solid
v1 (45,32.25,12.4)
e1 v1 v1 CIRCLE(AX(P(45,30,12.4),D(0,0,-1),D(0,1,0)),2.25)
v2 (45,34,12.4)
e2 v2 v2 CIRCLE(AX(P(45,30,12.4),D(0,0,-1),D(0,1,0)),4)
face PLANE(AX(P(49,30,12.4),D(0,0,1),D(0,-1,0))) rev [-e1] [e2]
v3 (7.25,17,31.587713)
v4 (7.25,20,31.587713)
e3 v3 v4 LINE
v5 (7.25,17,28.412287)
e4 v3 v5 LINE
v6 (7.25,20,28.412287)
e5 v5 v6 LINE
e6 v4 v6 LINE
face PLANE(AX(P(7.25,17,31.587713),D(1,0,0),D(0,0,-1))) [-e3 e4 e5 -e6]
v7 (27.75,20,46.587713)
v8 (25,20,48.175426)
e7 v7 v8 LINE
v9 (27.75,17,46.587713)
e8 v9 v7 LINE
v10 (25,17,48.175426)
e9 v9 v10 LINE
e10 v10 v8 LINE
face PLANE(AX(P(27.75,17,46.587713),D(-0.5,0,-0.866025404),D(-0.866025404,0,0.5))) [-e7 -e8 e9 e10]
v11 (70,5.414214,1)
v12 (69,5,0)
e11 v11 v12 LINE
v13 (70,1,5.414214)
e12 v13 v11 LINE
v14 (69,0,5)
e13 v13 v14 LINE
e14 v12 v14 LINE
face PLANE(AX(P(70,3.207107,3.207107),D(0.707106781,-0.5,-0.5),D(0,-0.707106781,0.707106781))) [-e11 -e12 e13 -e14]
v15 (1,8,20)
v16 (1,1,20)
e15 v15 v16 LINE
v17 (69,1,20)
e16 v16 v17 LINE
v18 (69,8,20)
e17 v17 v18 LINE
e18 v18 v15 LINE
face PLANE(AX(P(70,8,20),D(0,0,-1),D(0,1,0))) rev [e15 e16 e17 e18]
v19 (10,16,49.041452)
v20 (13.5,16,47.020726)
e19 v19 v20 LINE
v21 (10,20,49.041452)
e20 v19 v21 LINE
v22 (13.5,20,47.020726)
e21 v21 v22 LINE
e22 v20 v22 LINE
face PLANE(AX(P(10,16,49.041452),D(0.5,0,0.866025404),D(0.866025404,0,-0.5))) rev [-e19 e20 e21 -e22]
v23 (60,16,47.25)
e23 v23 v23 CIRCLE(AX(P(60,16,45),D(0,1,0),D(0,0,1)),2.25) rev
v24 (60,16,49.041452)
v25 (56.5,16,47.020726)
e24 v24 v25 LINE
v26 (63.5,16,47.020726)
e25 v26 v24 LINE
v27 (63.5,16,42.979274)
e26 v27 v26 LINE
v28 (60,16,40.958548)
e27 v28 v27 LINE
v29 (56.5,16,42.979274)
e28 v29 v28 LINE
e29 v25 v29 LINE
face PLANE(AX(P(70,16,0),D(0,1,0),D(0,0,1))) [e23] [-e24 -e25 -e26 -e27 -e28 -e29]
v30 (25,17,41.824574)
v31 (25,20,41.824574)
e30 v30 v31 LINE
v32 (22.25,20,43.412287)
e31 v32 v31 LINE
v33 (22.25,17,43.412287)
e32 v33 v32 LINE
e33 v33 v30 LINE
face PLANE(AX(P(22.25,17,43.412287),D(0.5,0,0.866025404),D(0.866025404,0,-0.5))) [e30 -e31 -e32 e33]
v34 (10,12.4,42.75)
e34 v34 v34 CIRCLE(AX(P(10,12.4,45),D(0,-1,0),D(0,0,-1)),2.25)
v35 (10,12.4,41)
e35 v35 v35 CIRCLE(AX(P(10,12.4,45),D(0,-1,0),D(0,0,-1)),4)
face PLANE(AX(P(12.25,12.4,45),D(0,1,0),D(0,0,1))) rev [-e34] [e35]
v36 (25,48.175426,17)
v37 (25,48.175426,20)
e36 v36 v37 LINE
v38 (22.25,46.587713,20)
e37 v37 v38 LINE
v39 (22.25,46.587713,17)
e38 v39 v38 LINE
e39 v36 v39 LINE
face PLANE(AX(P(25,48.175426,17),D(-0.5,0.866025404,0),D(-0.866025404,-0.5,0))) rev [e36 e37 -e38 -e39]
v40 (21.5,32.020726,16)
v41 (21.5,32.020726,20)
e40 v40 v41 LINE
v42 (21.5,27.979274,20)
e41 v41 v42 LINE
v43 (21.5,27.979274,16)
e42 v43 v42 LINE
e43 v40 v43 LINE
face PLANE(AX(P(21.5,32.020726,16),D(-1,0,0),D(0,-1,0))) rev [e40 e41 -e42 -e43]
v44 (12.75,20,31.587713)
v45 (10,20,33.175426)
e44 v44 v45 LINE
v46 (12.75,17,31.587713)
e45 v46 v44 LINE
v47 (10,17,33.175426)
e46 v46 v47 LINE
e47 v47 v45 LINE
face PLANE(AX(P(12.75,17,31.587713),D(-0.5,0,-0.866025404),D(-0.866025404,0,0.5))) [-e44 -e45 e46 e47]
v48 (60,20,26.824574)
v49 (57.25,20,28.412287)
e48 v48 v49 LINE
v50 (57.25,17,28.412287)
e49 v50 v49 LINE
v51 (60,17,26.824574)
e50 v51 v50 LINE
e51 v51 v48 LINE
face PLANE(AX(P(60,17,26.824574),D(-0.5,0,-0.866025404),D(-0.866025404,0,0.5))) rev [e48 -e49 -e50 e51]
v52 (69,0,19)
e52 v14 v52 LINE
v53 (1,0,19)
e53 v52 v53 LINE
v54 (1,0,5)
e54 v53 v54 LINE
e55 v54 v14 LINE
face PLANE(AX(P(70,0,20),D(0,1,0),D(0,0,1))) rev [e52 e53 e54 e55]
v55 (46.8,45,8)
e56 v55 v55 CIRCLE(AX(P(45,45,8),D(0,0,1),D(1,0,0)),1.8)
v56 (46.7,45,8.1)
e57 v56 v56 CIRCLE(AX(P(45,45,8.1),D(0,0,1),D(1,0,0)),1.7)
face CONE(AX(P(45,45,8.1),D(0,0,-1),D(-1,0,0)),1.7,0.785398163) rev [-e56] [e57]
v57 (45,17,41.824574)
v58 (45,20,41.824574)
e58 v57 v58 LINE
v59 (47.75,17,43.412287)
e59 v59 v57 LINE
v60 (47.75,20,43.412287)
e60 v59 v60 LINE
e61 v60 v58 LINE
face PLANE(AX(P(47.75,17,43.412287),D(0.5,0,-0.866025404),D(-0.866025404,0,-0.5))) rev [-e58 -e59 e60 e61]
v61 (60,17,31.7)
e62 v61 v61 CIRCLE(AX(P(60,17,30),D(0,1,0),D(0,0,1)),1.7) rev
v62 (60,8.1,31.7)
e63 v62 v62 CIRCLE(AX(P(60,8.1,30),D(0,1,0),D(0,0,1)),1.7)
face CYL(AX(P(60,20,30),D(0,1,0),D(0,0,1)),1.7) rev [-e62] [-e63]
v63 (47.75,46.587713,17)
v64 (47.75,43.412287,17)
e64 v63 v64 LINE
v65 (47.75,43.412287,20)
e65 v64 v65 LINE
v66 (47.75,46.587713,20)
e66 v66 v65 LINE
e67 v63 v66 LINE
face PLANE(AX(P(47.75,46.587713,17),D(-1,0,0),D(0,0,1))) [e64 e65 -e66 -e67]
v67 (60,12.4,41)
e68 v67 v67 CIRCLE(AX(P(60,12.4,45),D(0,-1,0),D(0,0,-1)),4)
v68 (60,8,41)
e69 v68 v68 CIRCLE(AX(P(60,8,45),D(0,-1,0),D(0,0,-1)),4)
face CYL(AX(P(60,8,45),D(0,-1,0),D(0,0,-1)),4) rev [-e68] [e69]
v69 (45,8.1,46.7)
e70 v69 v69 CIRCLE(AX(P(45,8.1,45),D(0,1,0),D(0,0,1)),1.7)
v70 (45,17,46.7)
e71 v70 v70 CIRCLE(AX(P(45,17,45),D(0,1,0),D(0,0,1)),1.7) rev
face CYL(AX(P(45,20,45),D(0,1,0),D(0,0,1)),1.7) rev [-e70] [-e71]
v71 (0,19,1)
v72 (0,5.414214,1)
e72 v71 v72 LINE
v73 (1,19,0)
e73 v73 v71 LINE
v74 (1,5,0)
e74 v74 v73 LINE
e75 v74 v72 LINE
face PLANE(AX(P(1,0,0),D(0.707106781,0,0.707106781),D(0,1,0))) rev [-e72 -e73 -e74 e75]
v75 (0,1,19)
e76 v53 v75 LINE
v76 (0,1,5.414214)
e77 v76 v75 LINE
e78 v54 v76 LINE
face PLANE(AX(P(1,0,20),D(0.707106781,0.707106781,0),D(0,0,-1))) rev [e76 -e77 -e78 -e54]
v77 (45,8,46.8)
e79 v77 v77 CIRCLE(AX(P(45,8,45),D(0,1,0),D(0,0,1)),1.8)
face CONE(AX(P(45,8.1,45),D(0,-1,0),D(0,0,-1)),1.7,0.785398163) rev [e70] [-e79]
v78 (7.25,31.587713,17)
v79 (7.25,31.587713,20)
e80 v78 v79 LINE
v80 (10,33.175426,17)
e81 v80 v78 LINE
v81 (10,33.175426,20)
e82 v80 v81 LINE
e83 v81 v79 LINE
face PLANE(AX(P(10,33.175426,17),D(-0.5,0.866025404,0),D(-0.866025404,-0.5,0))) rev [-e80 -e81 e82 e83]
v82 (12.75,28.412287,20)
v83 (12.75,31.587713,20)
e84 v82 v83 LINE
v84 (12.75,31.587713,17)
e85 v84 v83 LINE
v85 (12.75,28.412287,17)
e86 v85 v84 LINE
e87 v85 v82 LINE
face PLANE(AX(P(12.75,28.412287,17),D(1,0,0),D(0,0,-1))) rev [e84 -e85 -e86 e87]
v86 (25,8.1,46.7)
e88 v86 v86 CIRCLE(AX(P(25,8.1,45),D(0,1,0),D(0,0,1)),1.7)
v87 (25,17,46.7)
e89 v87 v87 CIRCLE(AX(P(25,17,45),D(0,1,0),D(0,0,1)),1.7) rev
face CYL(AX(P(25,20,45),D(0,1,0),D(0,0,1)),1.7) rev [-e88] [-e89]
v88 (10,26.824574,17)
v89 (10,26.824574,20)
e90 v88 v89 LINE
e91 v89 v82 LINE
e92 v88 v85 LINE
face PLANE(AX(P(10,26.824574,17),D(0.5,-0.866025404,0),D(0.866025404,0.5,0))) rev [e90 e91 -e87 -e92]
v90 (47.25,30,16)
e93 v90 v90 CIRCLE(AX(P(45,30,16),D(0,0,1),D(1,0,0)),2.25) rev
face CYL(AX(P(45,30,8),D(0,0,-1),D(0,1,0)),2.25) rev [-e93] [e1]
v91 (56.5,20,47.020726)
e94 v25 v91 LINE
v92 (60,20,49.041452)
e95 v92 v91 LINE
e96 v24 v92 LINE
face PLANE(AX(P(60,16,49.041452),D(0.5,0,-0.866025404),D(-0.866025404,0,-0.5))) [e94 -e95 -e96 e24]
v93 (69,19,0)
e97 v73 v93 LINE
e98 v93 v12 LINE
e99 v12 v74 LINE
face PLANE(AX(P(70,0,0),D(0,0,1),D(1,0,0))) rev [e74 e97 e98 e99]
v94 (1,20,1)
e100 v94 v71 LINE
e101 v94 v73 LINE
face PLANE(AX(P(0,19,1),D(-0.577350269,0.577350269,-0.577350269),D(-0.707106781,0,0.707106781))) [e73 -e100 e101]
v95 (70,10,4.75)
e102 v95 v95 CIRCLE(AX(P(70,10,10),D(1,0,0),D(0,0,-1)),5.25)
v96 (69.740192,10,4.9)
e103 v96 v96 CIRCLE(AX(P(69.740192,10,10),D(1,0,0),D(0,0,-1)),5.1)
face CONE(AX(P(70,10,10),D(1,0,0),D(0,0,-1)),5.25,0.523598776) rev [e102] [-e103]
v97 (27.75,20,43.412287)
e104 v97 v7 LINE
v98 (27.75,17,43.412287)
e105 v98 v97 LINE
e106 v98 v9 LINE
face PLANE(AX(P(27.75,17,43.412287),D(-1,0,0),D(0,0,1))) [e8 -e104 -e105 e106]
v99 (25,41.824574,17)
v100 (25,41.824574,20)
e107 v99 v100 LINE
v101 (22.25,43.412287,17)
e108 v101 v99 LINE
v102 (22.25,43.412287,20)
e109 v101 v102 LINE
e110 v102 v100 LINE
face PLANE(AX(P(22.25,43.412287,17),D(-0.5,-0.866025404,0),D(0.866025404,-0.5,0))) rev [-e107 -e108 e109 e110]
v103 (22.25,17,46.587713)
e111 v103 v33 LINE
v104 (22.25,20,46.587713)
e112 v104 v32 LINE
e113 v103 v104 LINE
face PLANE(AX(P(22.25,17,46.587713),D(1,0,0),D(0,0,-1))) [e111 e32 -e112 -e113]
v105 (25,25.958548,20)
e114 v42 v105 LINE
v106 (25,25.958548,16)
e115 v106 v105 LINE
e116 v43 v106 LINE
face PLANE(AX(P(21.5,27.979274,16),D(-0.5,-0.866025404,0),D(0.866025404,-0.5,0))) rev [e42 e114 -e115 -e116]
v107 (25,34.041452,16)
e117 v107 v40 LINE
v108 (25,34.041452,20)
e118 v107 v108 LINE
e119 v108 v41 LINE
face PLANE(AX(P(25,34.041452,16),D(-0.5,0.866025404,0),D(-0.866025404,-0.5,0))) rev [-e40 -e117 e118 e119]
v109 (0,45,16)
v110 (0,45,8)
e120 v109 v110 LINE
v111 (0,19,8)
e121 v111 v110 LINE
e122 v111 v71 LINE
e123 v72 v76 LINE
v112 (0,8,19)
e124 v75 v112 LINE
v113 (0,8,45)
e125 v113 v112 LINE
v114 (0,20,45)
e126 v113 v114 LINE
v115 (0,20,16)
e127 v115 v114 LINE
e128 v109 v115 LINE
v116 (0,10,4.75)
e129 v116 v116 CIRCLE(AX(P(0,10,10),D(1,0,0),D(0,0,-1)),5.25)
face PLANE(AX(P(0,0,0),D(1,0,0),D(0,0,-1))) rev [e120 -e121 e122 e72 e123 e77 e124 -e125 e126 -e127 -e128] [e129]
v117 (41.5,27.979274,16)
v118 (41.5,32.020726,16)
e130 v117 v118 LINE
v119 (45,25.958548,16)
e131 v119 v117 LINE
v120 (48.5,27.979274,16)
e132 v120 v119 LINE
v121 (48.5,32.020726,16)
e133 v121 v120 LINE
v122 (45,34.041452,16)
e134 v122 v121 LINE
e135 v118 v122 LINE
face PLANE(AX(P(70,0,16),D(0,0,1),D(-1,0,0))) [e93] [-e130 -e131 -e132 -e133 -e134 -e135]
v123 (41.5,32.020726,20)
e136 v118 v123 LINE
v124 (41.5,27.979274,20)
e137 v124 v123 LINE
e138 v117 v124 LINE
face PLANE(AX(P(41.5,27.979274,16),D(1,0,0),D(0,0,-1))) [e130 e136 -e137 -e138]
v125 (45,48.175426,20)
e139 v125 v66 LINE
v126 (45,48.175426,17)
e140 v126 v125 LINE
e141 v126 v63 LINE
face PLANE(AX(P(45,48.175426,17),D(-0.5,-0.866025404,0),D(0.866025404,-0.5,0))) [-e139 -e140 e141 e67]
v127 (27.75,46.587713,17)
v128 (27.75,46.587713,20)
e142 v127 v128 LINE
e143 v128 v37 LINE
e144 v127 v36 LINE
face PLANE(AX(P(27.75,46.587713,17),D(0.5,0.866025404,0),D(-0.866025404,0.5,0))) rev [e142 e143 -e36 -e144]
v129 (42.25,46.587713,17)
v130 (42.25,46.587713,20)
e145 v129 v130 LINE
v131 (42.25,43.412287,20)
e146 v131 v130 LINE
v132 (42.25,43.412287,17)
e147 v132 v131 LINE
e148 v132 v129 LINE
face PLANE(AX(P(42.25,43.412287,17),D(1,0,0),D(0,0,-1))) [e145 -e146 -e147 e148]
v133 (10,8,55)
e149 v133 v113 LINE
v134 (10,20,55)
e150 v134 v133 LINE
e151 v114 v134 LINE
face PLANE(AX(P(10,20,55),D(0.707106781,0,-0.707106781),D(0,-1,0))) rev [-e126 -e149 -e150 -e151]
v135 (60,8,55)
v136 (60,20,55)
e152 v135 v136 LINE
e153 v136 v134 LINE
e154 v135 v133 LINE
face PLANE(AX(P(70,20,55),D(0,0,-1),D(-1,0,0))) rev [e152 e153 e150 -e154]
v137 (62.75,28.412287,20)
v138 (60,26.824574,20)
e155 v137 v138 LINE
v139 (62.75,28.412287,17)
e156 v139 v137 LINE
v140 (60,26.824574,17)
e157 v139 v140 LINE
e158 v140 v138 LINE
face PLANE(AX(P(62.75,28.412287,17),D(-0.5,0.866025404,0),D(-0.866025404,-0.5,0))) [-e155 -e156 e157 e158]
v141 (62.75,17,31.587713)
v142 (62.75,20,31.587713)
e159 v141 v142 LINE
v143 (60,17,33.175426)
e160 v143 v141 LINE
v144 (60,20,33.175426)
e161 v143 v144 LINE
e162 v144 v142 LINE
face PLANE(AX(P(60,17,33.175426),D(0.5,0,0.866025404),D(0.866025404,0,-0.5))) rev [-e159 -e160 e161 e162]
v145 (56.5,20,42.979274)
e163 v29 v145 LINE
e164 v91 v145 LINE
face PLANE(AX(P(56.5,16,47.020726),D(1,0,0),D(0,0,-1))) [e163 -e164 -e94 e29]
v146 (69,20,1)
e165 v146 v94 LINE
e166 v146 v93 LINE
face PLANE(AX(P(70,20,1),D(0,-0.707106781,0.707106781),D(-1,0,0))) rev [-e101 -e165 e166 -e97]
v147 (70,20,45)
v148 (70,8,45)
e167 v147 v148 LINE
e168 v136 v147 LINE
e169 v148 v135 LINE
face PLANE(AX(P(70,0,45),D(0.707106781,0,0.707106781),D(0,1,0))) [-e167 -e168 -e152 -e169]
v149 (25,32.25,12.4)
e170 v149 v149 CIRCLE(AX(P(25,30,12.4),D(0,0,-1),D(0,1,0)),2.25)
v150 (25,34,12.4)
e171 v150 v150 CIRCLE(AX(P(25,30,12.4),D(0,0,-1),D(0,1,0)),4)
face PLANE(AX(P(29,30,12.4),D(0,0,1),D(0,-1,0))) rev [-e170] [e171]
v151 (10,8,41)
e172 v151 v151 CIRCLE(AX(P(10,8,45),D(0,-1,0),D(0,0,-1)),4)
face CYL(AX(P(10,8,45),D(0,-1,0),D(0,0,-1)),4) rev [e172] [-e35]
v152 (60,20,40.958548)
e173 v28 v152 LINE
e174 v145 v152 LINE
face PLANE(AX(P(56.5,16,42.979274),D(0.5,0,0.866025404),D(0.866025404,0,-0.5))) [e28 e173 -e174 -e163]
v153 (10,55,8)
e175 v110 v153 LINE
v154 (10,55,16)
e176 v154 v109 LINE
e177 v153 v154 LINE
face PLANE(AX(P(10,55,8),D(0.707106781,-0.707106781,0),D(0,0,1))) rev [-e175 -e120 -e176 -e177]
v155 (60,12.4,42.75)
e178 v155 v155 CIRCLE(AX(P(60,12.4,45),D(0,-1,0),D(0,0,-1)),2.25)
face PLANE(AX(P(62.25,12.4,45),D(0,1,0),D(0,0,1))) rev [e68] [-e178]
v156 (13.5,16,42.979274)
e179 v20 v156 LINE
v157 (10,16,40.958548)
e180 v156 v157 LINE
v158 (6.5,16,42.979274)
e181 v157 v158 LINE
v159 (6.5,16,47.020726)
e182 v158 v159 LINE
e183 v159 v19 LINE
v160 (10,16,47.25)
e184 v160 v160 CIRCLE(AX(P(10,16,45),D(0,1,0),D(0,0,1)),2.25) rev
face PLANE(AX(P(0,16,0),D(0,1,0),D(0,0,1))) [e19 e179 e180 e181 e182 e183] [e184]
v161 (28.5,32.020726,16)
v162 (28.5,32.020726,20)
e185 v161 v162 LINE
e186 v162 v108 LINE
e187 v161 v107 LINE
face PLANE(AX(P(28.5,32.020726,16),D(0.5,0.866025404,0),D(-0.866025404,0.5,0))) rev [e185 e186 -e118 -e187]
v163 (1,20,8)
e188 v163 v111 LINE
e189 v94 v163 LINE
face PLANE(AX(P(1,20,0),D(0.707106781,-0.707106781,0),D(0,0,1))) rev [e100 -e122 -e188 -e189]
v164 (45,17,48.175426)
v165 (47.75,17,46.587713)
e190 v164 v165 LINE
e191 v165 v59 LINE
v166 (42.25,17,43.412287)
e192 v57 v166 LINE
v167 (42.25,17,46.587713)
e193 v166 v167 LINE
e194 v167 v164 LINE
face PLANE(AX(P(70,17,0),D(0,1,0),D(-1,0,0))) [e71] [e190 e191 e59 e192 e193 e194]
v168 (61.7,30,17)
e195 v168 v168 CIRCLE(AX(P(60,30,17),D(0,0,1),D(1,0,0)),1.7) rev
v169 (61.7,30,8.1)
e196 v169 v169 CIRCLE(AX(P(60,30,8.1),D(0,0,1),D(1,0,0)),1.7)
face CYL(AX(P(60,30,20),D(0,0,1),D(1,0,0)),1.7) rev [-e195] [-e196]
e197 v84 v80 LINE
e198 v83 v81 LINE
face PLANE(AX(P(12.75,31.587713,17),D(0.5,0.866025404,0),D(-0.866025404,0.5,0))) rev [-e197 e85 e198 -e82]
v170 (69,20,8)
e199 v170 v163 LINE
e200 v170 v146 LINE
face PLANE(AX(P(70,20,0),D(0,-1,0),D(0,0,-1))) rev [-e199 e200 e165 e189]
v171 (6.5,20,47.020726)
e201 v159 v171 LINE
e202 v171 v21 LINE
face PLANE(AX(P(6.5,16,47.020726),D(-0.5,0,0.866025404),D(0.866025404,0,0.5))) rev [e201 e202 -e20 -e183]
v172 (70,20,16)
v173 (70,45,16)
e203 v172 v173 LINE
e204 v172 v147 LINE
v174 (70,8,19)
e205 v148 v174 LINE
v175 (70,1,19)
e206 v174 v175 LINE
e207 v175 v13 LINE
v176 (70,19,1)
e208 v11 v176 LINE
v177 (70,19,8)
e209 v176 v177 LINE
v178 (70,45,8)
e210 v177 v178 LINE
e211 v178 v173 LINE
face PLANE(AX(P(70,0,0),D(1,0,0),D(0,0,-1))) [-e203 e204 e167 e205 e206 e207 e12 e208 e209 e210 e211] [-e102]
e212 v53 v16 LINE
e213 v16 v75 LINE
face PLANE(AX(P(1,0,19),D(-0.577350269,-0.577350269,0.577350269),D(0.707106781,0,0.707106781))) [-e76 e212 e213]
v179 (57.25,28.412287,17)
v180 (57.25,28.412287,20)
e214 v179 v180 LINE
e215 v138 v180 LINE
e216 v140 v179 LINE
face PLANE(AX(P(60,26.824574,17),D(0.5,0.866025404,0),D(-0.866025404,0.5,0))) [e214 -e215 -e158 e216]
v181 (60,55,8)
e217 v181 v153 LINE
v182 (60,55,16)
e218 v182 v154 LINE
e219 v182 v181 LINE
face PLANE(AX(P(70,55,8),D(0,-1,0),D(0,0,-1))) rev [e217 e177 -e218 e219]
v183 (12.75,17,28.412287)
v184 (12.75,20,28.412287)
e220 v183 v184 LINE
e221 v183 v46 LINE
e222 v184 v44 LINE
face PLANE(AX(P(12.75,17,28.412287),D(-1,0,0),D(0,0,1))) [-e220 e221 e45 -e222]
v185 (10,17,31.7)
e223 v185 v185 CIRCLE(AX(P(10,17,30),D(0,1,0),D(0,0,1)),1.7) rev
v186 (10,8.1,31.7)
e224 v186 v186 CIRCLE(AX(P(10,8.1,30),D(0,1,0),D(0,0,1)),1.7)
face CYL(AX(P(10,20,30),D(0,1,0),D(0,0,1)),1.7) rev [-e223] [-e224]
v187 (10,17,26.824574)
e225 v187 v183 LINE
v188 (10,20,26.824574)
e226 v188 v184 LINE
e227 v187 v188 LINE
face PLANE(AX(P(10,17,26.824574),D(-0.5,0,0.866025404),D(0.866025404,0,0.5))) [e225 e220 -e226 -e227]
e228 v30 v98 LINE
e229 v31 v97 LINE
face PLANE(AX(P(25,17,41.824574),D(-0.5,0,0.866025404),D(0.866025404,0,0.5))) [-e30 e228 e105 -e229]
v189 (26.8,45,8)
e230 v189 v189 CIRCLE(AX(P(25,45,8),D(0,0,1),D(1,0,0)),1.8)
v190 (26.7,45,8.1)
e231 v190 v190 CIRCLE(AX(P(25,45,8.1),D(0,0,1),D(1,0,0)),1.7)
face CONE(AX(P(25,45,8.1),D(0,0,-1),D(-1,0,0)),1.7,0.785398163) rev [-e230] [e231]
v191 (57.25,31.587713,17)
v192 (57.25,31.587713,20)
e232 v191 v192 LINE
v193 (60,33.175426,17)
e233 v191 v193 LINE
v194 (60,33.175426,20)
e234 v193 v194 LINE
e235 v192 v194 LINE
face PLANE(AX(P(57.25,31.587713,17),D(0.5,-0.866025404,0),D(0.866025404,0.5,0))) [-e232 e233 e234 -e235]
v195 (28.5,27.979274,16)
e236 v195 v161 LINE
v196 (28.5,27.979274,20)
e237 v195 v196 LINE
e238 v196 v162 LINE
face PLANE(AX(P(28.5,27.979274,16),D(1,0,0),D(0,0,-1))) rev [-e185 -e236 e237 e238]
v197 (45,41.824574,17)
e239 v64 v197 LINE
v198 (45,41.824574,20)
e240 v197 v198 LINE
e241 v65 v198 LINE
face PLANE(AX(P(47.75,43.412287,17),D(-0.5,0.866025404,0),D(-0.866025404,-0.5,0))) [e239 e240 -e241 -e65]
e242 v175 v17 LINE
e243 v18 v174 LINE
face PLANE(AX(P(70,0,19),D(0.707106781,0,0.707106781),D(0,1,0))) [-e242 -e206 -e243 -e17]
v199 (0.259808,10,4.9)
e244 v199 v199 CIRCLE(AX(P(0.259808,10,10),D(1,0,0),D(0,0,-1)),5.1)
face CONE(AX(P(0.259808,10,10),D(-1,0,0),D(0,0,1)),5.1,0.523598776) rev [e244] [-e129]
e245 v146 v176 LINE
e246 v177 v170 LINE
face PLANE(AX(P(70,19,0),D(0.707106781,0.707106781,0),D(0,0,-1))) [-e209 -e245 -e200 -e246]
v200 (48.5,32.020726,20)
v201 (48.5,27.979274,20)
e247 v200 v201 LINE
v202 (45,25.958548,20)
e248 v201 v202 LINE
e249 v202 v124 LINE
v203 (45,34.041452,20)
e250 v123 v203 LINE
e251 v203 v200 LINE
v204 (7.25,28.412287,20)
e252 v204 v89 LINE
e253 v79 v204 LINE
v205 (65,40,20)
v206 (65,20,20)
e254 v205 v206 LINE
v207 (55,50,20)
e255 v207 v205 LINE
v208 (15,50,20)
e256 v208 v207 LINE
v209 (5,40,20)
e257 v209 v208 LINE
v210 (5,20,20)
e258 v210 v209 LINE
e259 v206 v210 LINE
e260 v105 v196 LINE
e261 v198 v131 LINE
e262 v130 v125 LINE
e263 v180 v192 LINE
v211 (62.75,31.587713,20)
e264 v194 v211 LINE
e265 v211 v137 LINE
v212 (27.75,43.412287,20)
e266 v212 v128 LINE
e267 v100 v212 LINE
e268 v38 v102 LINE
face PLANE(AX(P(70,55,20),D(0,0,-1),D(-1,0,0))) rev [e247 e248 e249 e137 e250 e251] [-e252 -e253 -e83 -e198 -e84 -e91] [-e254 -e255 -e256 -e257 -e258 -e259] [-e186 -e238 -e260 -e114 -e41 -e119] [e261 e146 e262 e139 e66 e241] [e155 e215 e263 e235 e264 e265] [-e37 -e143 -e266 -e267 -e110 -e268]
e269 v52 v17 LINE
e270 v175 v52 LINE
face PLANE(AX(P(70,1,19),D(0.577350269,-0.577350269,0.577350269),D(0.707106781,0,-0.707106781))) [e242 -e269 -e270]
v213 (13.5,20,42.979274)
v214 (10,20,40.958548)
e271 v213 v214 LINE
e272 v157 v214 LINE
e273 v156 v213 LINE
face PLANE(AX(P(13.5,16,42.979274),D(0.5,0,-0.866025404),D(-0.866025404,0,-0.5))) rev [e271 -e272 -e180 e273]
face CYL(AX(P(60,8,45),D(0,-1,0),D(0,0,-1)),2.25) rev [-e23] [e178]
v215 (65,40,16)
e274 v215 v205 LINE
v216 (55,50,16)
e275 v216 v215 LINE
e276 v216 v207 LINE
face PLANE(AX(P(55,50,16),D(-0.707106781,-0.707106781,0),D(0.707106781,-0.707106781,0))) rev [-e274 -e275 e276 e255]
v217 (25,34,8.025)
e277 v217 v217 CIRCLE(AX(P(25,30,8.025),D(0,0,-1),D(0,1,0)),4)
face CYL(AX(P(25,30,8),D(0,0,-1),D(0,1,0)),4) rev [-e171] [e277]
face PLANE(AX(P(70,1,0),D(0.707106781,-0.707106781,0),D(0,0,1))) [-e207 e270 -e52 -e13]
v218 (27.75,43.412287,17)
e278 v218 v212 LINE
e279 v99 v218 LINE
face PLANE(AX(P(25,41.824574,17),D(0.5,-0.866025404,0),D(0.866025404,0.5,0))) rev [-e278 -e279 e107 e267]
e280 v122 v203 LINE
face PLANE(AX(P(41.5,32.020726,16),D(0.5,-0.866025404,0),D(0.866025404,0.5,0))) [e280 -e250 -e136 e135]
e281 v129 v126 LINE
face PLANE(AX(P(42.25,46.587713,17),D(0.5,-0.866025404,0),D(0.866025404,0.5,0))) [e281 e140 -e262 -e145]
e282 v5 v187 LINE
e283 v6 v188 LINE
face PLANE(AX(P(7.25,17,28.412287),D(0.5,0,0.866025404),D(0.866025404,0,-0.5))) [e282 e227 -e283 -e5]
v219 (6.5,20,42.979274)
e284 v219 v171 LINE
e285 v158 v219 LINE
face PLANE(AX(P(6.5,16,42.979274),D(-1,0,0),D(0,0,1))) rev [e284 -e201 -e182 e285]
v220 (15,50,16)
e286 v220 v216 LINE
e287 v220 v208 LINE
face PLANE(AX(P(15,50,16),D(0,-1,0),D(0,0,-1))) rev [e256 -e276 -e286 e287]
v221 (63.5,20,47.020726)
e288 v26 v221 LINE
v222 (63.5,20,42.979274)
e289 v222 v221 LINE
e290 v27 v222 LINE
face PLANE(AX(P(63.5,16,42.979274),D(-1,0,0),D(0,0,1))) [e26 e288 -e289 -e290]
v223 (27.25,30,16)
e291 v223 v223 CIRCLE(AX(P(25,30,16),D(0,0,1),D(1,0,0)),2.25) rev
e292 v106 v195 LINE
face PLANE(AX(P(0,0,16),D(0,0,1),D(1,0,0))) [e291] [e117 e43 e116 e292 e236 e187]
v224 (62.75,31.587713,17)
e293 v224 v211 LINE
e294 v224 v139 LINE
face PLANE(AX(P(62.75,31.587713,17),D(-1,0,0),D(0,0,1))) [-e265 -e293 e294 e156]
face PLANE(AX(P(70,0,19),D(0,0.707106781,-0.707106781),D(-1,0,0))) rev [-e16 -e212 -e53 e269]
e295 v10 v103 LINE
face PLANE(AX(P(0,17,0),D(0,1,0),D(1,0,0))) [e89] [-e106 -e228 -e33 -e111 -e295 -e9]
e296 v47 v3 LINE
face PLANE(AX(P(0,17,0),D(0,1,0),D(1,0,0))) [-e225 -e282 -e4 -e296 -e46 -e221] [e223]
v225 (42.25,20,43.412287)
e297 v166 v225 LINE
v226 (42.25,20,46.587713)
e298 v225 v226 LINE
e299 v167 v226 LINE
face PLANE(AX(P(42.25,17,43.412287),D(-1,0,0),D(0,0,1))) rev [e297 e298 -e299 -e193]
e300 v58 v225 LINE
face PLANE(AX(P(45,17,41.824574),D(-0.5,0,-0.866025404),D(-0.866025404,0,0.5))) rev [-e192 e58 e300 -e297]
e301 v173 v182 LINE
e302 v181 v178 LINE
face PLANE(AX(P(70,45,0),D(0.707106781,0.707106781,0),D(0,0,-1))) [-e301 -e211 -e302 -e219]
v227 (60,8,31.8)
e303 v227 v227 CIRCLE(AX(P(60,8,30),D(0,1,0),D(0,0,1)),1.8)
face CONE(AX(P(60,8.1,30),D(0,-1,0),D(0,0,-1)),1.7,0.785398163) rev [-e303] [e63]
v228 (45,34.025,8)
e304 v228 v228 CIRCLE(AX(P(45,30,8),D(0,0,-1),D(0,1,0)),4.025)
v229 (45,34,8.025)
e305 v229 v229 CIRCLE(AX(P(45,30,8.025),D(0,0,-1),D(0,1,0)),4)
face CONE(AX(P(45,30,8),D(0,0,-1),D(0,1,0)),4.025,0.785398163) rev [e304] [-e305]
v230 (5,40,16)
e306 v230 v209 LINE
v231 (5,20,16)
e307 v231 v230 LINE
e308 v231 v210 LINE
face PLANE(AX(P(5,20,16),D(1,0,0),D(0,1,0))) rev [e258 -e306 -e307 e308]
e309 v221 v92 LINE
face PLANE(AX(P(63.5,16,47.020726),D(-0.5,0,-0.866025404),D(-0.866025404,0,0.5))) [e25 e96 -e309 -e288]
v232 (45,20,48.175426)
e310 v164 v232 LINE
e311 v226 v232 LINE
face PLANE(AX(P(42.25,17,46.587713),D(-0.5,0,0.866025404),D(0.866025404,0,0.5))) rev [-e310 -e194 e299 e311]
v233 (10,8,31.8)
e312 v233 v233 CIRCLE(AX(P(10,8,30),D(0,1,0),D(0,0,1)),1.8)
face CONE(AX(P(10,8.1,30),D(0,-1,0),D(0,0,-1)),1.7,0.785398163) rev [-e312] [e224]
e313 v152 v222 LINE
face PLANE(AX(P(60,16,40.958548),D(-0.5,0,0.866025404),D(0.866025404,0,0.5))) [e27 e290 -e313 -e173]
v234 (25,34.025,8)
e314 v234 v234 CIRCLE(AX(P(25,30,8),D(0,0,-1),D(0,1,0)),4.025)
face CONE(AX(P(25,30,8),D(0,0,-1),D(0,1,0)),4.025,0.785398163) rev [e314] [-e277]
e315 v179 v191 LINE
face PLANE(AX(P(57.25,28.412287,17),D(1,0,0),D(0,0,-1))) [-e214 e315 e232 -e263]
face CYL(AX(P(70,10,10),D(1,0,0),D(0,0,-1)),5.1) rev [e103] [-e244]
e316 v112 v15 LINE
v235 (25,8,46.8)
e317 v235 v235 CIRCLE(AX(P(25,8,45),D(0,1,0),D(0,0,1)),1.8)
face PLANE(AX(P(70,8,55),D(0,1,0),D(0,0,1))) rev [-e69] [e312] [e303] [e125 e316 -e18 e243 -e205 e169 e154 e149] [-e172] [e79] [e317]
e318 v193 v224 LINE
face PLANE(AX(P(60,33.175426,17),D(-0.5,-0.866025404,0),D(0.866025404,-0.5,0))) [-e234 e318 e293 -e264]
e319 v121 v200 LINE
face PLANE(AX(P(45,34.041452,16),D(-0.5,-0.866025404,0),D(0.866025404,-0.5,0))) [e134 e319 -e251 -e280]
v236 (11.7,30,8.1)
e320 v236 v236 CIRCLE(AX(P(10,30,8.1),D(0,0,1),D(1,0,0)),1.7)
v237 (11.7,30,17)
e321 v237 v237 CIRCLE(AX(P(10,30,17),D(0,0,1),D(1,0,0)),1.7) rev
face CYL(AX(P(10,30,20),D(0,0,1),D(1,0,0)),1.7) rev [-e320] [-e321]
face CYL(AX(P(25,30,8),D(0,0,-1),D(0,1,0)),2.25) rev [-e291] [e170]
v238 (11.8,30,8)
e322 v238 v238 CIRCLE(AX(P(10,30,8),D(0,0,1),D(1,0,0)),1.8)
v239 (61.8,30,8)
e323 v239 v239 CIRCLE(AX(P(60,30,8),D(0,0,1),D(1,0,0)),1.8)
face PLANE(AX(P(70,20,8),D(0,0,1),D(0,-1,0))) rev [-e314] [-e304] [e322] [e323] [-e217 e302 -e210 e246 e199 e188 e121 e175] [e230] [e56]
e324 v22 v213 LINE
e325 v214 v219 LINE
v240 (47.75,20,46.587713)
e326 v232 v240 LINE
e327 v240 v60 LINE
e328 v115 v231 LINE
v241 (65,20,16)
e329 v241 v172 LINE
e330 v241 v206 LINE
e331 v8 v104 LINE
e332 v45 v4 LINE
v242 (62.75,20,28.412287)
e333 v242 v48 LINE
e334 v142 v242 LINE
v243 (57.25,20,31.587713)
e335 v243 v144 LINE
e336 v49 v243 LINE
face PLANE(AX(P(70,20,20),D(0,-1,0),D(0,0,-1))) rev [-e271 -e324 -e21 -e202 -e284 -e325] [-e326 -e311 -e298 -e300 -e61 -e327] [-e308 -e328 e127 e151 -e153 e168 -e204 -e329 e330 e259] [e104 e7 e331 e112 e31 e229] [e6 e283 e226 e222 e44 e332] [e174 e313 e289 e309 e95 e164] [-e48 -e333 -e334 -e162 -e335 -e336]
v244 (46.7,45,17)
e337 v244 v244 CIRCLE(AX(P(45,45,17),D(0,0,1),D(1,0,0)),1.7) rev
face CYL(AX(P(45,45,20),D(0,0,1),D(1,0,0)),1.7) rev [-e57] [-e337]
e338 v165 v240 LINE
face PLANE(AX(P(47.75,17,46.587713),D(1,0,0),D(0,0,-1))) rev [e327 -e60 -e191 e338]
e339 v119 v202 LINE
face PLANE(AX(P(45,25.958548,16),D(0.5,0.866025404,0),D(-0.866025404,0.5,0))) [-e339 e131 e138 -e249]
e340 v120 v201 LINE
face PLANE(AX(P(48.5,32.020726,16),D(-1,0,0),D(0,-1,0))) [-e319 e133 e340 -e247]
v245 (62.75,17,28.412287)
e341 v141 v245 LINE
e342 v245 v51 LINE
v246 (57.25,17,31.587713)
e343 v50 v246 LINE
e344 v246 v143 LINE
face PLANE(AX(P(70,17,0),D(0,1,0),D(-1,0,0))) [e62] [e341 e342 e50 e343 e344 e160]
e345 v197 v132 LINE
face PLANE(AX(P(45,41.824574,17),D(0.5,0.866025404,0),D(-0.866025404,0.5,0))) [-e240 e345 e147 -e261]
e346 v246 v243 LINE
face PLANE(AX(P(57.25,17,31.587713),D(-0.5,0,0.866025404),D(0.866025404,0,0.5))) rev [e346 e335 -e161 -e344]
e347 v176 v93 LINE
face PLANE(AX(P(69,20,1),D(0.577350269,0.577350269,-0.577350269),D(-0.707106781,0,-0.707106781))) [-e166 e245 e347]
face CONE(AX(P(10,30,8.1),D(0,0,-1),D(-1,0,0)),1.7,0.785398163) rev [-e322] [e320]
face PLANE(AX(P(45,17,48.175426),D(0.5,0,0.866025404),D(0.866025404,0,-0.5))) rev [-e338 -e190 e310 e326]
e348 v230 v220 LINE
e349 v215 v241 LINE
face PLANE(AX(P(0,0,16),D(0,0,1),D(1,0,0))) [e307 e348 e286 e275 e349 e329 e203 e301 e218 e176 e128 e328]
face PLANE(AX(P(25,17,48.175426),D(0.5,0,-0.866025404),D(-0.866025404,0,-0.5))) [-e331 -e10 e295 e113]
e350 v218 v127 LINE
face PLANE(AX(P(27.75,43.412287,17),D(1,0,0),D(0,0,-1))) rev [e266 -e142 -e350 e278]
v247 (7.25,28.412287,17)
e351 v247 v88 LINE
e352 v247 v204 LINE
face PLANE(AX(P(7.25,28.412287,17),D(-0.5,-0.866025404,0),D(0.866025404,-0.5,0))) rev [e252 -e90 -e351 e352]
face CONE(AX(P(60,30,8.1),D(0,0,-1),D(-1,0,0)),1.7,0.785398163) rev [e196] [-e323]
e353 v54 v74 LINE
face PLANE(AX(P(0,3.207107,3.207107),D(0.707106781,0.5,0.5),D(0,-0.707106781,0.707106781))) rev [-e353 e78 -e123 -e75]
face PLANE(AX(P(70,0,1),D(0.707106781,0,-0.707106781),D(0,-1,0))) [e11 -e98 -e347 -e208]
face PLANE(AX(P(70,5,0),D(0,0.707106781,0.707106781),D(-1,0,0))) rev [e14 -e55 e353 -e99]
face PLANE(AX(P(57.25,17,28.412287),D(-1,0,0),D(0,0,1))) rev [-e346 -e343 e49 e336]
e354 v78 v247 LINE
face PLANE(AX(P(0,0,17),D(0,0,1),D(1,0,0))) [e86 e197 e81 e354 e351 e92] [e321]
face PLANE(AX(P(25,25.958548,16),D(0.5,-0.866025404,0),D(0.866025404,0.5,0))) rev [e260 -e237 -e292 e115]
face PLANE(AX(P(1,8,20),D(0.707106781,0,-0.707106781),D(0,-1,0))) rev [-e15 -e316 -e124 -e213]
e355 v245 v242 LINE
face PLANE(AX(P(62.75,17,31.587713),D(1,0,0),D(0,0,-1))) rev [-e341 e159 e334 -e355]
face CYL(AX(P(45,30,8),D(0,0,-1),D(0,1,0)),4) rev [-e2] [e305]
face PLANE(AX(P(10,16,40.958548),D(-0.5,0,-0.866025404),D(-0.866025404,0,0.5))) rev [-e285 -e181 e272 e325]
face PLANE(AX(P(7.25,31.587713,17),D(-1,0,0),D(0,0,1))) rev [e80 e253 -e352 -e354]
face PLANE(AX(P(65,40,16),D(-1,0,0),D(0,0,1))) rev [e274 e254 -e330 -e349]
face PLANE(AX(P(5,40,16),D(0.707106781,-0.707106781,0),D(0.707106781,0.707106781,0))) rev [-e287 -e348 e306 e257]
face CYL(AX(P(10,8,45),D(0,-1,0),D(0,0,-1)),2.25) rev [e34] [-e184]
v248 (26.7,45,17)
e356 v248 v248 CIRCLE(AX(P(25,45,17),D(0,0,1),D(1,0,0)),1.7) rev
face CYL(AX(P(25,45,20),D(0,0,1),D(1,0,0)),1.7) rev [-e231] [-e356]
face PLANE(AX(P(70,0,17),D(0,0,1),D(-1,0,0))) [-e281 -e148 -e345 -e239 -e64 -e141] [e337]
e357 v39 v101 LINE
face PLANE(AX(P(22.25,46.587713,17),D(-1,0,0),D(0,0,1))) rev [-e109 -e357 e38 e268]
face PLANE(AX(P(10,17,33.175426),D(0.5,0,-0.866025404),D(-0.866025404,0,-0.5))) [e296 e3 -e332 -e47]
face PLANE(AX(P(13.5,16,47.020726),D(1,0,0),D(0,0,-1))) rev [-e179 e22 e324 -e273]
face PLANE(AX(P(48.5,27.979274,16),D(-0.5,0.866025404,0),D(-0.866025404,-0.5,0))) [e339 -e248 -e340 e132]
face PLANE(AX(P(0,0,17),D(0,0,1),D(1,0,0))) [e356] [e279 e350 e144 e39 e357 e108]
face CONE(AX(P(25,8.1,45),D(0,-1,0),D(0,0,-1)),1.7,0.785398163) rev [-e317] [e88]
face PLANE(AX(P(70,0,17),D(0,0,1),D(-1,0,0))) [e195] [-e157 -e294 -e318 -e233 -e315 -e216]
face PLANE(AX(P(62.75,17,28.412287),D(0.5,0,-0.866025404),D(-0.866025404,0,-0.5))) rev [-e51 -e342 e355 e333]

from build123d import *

# Parameters (mm, degrees)
BODY_DEPTH                             = 70
FRONTAL_M3_NUT_CUTOUTS_DEPTH           = 3
FRONTAL_M4_NUT_CUTOUT_DEPTH            = 4
MAIN_CHAMFER_SIZE                      = 5
SIDE_CHAMFER_SIZE                      = 1
WALL_CHAMFERS_SIZE                     = 10
CLEARANCE_CUTOUT_DEPTH                 = 4
M3_FULL_MIRROR_COPY_3_DEPTH            = 3
BOTTOM_BOARD_MOUNTING_HOLE_D           = 4.5
BOTTOM_BOARD_MOUNTING_HOLE_CBORE_D     = 8
BOTTOM_BOARD_MOUNTING_HOLE_CBORE_DEPTH = 4.4
BOTTOM_M4_NUT_CUTOUT_DEPTH             = 4


# Read off the part's stored shape, not the designer's step: hull_mounting_holes
with BuildPart() as part:
    # body_sketch → body (new body)
    with BuildSketch(Plane(origin=(0, 0, 0), x_dir=(0, 0, -1), z_dir=(1, 0, 0))):
        Polygon((0, 0), (0, 20), (-8, 20), (-8, 55), (-20, 55), (-20, 20), (-55, 20), (-55, 8), (-20, 8), (-20, 0), align=None)
    extrude(amount=BODY_DEPTH)

    # rod_hole_sketch_auto → rod_hole_d10 (revolve, cut)
    with BuildSketch(Plane(origin=(70, 10, 10), x_dir=(0, 0, -1), z_dir=(0, 1, 0))):
        Polygon((0, 0), (0, 70), (5.25, 70), (5.1, 69.740192379), (5.1, 0.259807621), (5.25, 0), align=None)
    revolve(axis=Axis((76.35, 10, 10), (-1, 0, 0)), mode=Mode.SUBTRACT)

    # hull_mounting_holes outline → hull_mounting_holes (revolve, cut)
    with BuildSketch(Plane(origin=(25, 45, 0), x_dir=(1, 0, 0), z_dir=(0, -1, 0))):
        Polygon((0, 8), (1.8, 8), (1.7, 8.1), (1.7, 19.9), (1.8, 20), (0, 20), align=None)
    hull_mounting_holes = revolve(axis=Axis((25, 45, 0), (0, 0, 1)), mode=Mode.SUBTRACT)

    # hull_mounting_holes 2 outline → hull_mounting_holes 2 (revolve, cut)
    with BuildSketch(Plane(origin=(10, 30, 0), x_dir=(1, 0, 0), z_dir=(0, -1, 0))):
        Polygon((0, 8), (1.8, 8), (1.7, 8.1), (1.7, 19.9), (1.8, 20), (0, 20), align=None)
    hull_mounting_holes_2 = revolve(axis=Axis((10, 30, 0), (0, 0, 1)), mode=Mode.SUBTRACT)

    # Sketch8 → board_mounting_hole (revolve, cut)
    with BuildSketch(Plane(origin=(25, 30, 8), x_dir=(0, 1, 0), z_dir=(1, 0, 0))):
        Polygon((0, 0), (0, 12), (2.275, 12), (2.25, 11.975), (2.25, 4.4), (4, 4.4), (4, 0.025), (4.025, 0), align=None)
    board_mounting_hole = revolve(axis=Axis((25, 30, 1.65), (0, 0, 1)), mode=Mode.SUBTRACT)

    # Sketch9 → frontal_m3_nut_cutouts (cut)
    with BuildSketch(Plane.XY.offset(20)):
        Polygon((25, 48.175426481), (22.25, 46.58771324), (22.25, 43.41228676), (25, 41.824573519), (27.75, 43.41228676), (27.75, 46.58771324), align=None)
        Polygon((10, 33.175426481), (7.25, 31.58771324), (7.25, 28.41228676), (10, 26.824573519), (12.75, 28.41228676), (12.75, 31.58771324), align=None)
    frontal_m3_nut_cutouts = extrude(amount=-FRONTAL_M3_NUT_CUTOUTS_DEPTH, mode=Mode.SUBTRACT)

    # Sketch10 → frontal_m4_nut_cutout (cut)
    with BuildSketch(Plane.XY.offset(20)):
        Polygon((21.5, 32.020725942), (21.5, 27.979274058), (25, 25.958548116), (28.5, 27.979274058), (28.5, 32.020725942), (25, 34.041451884), align=None)
    frontal_m4_nut_cutout = extrude(amount=-FRONTAL_M4_NUT_CUTOUT_DEPTH, mode=Mode.SUBTRACT)

    # frontal_m4_mirror: board_mounting_hole, frontal_m4_nut_cutout across plane
    add(board_mounting_hole.mirror(Plane.ZY.offset(-35)), mode=Mode.SUBTRACT)
    add(frontal_m4_nut_cutout.mirror(Plane.ZY.offset(-35)), mode=Mode.SUBTRACT)

    # main_chamfer
    main_chamfer_edges = [part.edges().sort_by_distance(p)[0] for p in [
        (35, 0, 0),
    ]]
    chamfer(main_chamfer_edges, length=MAIN_CHAMFER_SIZE)

    # side_chamfer
    side_chamfer_edges = [part.edges().sort_by_distance(p)[0] for p in [
        (0, 4, 20),
        (70, 20, 4),
        (0, 20, 4),
        (0, 0, 12.5),
        (0, 12.5, 0),
        (70, 12.5, 0),
        (0, 2.5, 2.5),
        (70, 2.5, 2.5),
        (35, 0, 20),
        (35, 20, 0),
        (70, 4, 20),
        (70, 0, 12.5),
    ]]
    chamfer(side_chamfer_edges, length=SIDE_CHAMFER_SIZE)

    # wall_chamfers
    wall_chamfers_edges = [part.edges().sort_by_distance(p)[0] for p in [
        (0, 14, 55),
        (0, 55, 14),
        (70, 55, 14),
        (70, 14, 55),
    ]]
    chamfer(wall_chamfers_edges, length=WALL_CHAMFERS_SIZE)

    # Sketch11 → clearance_cutout (cut)
    with BuildSketch(Plane.XY.offset(20)):
        Polygon((0, 20), (5, 20), (5, 40), (15, 50), (55, 50), (65, 40), (65, 20), (70, 20), (70, 45), (60, 55), (10, 55), (0, 45), align=None)
    extrude(amount=-CLEARANCE_CUTOUT_DEPTH, mode=Mode.SUBTRACT)

    # bottom_m3_mirror: hull_mounting_holes, hull_mounting_holes 2, frontal_m3_nut_cutouts across plane
    add(hull_mounting_holes.mirror(Plane(origin=(0, 0, 0), x_dir=(0, 0.7071067811865476, 0.7071067811865475), z_dir=(0, 0.7071067811865475, -0.7071067811865476))), mode=Mode.SUBTRACT)
    add(hull_mounting_holes_2.mirror(Plane(origin=(0, 0, 0), x_dir=(0, 0.7071067811865476, 0.7071067811865475), z_dir=(0, 0.7071067811865475, -0.7071067811865476))), mode=Mode.SUBTRACT)
    add(frontal_m3_nut_cutouts.mirror(Plane(origin=(0, 0, 0), x_dir=(0, 0.7071067811865476, 0.7071067811865475), z_dir=(0, 0.7071067811865475, -0.7071067811865476))), mode=Mode.SUBTRACT)

    # m3_full_mirror: hull_mounting_holes, hull_mounting_holes 2, frontal_m3_nut_cutouts across plane
    add(hull_mounting_holes.mirror(Plane.ZY.offset(-35)), mode=Mode.SUBTRACT)
    add(hull_mounting_holes_2.mirror(Plane.ZY.offset(-35)), mode=Mode.SUBTRACT)
    add(frontal_m3_nut_cutouts.mirror(Plane.ZY.offset(-35)), mode=Mode.SUBTRACT)

    # m3_full_mirror copy 1 sketch → m3_full_mirror copy 1 (revolve, cut)
    with BuildSketch(Plane(origin=(45, 0, 45), x_dir=(-1, 0, 0), z_dir=(0, 0, -1))):
        Polygon((0, 8), (1.8, 8), (1.7, 8.1), (1.7, 19.9), (1.8, 20), (0, 20), align=None)
    revolve(axis=Axis((45, 0, 45), (0, 1, 0)), mode=Mode.SUBTRACT)

    # m3_full_mirror copy 2 sketch → m3_full_mirror copy 2 (revolve, cut)
    with BuildSketch(Plane(origin=(60, 0, 30), x_dir=(-1, 0, 0), z_dir=(0, 0, -1))):
        Polygon((0, 8), (1.8, 8), (1.7, 8.1), (1.7, 19.9), (1.8, 20), (0, 20), align=None)
    revolve(axis=Axis((60, 0, 30), (0, 1, 0)), mode=Mode.SUBTRACT)

    # m3_full_mirror copy 3 sketch → m3_full_mirror copy 3 (cut)
    with BuildSketch(Plane(origin=(70, 20, 0), x_dir=(-1, 0, 0), z_dir=(0, 1, 0))):
        Polygon((25, 48.175426481), (22.25, 46.58771324), (22.25, 43.41228676), (25, 41.824573519), (27.75, 43.41228676), (27.75, 46.58771324), align=None)
        Polygon((10, 33.175426481), (7.25, 31.58771324), (7.25, 28.41228676), (10, 26.824573519), (12.75, 28.41228676), (12.75, 31.58771324), align=None)
    extrude(amount=-M3_FULL_MIRROR_COPY_3_DEPTH, mode=Mode.SUBTRACT)

    # m3_full_mirror copy 4 sketch → m3_full_mirror copy 4 (revolve, cut)
    with BuildSketch(Plane(origin=(60, 30, 0), x_dir=(-1, 0, 0), z_dir=(0, -1, 0))):
        Polygon((0, -8), (1.8, -8), (1.7, -8.1), (1.7, -19.9), (1.8, -20), (0, -20), align=None)
    revolve(axis=Axis((60, 30, 0), (0, 0, -1)), mode=Mode.SUBTRACT)

    # bottom_board_mounting_hole (through all)
    with Locations(Plane.XZ.offset(-8)):
        with Locations((10, 45)):
            bottom_board_mounting_hole = CounterBoreHole(BOTTOM_BOARD_MOUNTING_HOLE_D / 2, BOTTOM_BOARD_MOUNTING_HOLE_CBORE_D / 2, BOTTOM_BOARD_MOUNTING_HOLE_CBORE_DEPTH)

    # Sketch15 → bottom_m4_nut_cutout (cut)
    with BuildSketch(Plane(origin=(0, 20, 0), x_dir=(1, 0, 0), z_dir=(0, 1, 0))):
        Polygon((10, -40.958548116), (6.5, -42.979274058), (6.5, -47.020725942), (10, -49.041451884), (13.5, -47.020725942), (13.5, -42.979274058), align=None)
    bottom_m4_nut_cutout = extrude(amount=-BOTTOM_M4_NUT_CUTOUT_DEPTH, mode=Mode.SUBTRACT)

    # bottom_m4_mirror: bottom_board_mounting_hole, bottom_m4_nut_cutout across plane
    add(bottom_board_mounting_hole.mirror(Plane.ZY.offset(-35)), mode=Mode.SUBTRACT)
    add(bottom_m4_nut_cutout.mirror(Plane.ZY.offset(-35)), mode=Mode.SUBTRACT)


solid = part.part
